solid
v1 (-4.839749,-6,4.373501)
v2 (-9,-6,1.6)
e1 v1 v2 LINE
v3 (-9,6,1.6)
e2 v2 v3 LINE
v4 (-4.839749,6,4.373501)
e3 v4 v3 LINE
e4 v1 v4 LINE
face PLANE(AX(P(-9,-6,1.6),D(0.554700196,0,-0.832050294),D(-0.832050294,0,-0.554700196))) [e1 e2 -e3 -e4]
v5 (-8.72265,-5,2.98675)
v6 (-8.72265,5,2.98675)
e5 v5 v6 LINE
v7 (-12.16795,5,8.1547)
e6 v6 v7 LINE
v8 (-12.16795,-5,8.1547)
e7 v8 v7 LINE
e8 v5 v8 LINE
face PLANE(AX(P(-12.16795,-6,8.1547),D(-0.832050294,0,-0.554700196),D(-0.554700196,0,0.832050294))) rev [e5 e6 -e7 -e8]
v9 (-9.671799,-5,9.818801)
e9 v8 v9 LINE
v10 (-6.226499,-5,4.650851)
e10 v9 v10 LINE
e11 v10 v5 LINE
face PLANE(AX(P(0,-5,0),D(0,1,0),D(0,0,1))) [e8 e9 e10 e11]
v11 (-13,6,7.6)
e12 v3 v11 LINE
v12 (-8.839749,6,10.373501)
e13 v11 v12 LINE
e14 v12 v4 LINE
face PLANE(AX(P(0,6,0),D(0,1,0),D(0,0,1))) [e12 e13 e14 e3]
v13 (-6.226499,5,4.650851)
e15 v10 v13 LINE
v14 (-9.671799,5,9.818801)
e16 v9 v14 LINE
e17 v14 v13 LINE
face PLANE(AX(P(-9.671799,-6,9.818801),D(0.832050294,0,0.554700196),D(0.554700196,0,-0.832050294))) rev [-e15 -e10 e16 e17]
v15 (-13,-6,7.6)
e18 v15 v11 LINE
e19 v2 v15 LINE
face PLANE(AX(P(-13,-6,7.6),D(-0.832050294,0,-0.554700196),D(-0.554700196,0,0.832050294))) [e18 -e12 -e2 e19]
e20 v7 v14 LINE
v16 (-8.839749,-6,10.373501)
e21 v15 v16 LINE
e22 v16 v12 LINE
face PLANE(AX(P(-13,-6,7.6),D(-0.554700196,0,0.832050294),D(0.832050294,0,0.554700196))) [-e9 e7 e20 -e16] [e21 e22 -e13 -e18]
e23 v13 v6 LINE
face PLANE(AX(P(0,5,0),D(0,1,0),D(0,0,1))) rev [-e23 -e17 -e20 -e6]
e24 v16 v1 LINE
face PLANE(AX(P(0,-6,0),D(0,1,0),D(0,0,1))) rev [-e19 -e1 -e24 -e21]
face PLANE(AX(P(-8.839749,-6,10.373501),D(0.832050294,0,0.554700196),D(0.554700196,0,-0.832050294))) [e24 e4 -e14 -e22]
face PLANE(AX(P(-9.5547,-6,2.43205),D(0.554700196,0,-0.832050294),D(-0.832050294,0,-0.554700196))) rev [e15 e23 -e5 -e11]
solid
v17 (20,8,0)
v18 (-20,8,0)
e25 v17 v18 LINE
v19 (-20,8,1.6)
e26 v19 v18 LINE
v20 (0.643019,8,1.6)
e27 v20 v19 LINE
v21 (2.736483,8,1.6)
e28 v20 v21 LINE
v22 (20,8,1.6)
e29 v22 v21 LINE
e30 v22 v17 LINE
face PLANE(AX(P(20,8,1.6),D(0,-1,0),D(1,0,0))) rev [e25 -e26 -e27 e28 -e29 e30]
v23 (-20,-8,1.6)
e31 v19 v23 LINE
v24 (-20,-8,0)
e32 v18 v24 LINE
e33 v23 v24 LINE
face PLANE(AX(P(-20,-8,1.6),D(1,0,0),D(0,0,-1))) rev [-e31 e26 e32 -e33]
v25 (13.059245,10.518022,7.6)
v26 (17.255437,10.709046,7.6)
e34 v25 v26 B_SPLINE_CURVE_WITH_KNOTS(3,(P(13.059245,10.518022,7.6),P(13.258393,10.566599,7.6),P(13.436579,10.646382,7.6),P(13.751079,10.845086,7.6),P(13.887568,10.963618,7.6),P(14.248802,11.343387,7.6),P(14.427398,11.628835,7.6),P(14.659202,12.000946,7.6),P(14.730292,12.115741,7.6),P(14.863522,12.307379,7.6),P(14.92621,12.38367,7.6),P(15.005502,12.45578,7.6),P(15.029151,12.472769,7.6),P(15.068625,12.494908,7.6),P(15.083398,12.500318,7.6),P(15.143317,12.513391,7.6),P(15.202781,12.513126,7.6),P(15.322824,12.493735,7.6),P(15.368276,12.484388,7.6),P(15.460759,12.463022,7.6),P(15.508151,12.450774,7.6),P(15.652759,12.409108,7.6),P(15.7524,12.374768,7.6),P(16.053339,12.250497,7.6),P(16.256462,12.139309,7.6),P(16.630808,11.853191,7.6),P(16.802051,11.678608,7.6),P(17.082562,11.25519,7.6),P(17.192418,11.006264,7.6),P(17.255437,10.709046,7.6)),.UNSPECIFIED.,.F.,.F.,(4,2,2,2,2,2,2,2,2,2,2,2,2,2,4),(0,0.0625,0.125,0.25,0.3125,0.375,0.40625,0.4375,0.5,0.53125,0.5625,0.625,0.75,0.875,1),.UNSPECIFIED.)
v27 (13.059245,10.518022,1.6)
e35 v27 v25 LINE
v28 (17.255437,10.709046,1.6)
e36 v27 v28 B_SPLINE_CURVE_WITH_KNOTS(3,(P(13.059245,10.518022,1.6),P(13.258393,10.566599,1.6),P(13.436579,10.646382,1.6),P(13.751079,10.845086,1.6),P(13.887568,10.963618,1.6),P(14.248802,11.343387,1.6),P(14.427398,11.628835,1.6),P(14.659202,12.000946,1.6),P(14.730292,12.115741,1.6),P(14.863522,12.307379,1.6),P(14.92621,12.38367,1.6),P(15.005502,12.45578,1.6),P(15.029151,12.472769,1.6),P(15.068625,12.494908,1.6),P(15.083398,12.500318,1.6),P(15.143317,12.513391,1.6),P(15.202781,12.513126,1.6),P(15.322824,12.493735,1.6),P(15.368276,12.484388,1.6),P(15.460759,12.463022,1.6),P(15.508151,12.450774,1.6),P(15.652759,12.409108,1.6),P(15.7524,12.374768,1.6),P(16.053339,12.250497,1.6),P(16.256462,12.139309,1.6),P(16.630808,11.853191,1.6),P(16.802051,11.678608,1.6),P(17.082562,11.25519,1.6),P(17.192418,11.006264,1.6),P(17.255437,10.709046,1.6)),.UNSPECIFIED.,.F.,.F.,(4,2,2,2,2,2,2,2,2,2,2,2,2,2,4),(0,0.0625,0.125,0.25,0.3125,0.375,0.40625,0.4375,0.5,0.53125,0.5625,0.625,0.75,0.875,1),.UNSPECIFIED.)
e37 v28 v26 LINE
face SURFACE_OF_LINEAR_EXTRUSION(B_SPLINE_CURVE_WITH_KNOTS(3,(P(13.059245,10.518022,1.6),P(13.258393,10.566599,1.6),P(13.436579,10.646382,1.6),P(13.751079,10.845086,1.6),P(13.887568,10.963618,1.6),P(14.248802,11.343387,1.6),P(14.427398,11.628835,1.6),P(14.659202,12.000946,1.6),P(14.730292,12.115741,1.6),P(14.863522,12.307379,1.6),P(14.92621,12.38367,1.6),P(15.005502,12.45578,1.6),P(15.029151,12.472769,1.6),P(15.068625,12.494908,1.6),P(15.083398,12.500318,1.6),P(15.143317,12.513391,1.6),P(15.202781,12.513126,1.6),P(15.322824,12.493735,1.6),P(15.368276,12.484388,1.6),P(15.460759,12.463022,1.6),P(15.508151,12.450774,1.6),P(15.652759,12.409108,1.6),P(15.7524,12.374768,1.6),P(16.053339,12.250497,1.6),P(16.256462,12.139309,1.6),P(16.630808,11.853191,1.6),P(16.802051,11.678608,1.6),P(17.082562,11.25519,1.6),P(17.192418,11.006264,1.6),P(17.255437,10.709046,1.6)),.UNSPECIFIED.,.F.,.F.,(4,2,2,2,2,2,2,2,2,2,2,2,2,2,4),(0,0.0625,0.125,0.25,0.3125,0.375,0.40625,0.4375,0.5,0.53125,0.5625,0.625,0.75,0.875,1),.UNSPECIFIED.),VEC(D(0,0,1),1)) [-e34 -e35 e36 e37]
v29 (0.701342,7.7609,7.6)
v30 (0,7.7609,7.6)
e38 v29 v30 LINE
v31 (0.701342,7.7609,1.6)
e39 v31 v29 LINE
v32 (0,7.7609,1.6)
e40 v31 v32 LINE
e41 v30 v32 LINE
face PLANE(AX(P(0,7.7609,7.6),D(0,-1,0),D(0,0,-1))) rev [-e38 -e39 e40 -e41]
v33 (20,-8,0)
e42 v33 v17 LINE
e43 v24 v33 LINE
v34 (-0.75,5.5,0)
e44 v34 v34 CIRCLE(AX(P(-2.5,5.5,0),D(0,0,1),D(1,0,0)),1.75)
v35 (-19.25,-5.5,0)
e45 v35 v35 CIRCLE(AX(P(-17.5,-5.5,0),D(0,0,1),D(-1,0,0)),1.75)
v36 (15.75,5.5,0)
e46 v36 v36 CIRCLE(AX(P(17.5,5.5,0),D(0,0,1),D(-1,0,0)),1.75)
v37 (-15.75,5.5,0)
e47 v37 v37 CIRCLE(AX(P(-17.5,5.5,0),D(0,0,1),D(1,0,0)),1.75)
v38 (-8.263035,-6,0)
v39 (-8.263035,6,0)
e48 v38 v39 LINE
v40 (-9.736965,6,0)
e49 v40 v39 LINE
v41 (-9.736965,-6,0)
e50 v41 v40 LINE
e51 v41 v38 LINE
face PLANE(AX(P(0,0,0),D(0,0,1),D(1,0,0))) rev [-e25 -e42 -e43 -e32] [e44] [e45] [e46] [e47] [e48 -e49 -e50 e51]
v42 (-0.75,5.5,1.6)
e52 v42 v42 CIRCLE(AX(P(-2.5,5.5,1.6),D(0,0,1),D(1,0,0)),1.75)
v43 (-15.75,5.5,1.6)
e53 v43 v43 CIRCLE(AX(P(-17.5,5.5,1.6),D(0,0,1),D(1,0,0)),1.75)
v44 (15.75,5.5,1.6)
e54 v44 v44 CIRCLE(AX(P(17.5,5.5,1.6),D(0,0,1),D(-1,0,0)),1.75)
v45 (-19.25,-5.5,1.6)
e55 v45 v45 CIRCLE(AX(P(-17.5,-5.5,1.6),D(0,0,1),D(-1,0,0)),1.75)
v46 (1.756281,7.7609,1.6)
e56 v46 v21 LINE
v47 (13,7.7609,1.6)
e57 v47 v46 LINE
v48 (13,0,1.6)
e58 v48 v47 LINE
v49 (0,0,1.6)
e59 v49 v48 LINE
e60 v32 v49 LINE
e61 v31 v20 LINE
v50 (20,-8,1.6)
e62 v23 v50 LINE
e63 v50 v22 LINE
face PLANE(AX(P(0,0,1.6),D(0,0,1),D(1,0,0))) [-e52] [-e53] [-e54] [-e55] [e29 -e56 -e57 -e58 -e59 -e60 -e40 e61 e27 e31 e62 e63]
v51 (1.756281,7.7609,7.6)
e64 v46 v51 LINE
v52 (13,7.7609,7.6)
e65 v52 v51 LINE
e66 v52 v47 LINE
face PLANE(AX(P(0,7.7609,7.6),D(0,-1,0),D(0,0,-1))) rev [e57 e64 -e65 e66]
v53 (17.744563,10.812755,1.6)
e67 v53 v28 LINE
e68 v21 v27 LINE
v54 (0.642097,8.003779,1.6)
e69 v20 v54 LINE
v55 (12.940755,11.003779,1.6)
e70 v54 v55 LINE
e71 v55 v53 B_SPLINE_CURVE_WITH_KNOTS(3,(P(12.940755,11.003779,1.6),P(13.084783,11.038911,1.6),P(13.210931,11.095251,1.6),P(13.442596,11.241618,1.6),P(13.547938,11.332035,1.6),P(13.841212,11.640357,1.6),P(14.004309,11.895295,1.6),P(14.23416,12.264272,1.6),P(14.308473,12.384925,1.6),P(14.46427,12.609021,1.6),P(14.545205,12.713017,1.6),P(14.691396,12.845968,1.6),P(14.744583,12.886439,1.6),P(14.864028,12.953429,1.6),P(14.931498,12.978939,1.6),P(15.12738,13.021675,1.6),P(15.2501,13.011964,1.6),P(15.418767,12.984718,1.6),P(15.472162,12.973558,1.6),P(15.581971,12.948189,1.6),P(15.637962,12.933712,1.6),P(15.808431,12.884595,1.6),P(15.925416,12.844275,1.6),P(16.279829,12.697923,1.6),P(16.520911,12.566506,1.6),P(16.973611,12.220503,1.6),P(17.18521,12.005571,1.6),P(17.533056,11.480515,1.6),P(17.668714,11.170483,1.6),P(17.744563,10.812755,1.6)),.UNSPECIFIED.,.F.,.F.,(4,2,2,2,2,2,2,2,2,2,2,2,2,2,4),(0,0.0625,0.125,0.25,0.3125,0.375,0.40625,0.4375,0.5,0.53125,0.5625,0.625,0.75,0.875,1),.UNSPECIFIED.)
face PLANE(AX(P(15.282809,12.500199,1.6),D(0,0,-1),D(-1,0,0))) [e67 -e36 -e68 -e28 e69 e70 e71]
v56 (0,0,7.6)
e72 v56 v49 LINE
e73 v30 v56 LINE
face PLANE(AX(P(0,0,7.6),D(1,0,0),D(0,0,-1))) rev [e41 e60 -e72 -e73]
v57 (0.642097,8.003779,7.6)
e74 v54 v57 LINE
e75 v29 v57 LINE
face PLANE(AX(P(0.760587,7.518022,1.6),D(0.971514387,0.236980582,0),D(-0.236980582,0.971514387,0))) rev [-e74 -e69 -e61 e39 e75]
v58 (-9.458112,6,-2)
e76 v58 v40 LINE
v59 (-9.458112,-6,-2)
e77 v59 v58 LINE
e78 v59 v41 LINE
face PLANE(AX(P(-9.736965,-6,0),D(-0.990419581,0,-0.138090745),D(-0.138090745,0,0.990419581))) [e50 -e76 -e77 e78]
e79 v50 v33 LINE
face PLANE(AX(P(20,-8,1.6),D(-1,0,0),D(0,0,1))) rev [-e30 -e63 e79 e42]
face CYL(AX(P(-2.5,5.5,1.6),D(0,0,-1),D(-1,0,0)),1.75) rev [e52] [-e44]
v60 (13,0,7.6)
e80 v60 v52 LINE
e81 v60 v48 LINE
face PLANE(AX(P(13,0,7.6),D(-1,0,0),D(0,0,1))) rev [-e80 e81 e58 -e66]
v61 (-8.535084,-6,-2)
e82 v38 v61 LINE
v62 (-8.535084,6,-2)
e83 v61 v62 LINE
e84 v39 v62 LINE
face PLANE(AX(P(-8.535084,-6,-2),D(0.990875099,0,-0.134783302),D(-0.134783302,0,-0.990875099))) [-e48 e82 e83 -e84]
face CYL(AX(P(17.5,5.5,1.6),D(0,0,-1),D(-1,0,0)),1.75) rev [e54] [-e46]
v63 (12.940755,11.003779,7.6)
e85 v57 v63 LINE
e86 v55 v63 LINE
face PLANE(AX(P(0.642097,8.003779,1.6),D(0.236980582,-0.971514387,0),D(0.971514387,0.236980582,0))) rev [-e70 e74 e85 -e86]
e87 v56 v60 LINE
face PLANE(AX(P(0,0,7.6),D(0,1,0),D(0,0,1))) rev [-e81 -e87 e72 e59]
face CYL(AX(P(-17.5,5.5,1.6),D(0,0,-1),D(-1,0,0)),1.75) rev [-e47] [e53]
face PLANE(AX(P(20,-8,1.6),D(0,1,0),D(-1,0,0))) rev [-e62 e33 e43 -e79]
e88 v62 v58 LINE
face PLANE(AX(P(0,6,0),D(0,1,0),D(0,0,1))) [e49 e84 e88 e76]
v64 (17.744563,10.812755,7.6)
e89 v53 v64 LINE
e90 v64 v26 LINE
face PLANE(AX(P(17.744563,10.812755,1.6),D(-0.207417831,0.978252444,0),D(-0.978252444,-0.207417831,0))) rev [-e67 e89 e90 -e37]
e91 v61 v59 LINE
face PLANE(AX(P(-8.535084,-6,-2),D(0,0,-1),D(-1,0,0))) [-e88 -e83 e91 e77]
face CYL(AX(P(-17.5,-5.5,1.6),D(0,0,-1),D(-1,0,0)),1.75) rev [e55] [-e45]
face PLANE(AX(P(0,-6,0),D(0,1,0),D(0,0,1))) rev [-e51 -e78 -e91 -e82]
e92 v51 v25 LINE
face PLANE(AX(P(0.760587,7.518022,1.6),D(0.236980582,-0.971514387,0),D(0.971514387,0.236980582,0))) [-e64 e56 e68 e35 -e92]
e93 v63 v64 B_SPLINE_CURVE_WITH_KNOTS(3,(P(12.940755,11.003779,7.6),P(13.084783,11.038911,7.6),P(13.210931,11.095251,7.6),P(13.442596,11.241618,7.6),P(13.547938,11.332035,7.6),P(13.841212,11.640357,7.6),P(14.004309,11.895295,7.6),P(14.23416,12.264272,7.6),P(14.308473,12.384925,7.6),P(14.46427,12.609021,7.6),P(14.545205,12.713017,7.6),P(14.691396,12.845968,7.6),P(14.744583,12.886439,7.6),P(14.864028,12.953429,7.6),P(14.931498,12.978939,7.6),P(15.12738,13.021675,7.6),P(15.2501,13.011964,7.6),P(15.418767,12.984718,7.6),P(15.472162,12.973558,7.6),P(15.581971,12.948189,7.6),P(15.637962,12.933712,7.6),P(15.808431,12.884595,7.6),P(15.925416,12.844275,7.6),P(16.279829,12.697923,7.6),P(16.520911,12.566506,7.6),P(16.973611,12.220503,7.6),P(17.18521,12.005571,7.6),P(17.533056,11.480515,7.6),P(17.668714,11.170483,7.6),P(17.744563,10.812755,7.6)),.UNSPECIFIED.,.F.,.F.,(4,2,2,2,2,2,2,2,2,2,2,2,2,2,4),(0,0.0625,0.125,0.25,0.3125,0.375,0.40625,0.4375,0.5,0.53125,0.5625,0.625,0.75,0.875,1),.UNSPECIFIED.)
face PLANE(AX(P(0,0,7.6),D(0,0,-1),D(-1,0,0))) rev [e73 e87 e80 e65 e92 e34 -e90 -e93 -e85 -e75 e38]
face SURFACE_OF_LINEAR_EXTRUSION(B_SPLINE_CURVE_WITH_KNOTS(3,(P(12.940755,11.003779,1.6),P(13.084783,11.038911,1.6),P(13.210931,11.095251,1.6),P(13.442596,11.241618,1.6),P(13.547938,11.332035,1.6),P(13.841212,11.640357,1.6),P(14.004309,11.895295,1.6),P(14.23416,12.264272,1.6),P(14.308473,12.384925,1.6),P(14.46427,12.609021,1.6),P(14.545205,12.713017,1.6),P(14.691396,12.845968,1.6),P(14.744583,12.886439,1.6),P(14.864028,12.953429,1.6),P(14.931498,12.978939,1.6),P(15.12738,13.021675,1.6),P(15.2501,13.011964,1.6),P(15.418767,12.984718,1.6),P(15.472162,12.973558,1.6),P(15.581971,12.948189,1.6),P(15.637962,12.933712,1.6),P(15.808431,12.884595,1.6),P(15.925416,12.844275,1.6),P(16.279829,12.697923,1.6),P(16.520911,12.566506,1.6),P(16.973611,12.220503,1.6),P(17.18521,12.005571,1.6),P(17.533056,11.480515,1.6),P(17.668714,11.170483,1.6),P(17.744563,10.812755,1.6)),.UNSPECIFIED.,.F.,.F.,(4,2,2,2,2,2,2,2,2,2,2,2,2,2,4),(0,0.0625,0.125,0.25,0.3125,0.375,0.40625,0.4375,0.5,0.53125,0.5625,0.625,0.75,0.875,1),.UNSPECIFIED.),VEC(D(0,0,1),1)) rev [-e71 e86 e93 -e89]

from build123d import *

# Parameters (mm, degrees)
SKETCH1_W           = 40
SKETCH1_H           = 16
SKETCH1_R           = 1.75
EXTRUDE1_DEPTH      = 1.6
SKETCH2_W           = 13
SKETCH2_H           = 7.760900167
EXTRUDE2_DEPTH      = 6
EXTRUDE_THIN1_START = -6
EXTRUDE_THIN1_DEPTH = 6
EXTRUDE3_DEPTH      = 6
EXTRUDE3_DEPTH_BACK = 6
SHELL1_T            = -1
EXTRUDE4_DEPTH      = 6
EXTRUDE4_DEPTH_BACK = 6


# Read off the part's stored shape, not the designer's step: Extrude-Thin1
with BuildPart() as part:
    # Sketch1 → Extrude1 (new body)
    with BuildSketch(Plane.XY):
        Rectangle(SKETCH1_W, SKETCH1_H)
        with Locations((-17.5, 5.5)):
            Circle(SKETCH1_R, mode=Mode.SUBTRACT)
        with Locations(Location((17.5, 5.5, 0), (0, 0, 180))):
            Circle(SKETCH1_R, mode=Mode.SUBTRACT)
        with Locations(Location((-17.5, -5.5, 0), (0, 0, 180))):
            Circle(SKETCH1_R, mode=Mode.SUBTRACT)
        with Locations((-2.5, 5.5)):
            Circle(SKETCH1_R, mode=Mode.SUBTRACT)
    extrude(amount=EXTRUDE1_DEPTH)

    # Sketch2 → Extrude2 (add)
    with BuildSketch(Plane.XY.offset(1.6)):
        with Locations((6.5, 3.880450084)):
            Rectangle(SKETCH2_W, SKETCH2_H)
    extrude(amount=EXTRUDE2_DEPTH)

    # Extrude-Thin1 outline → Extrude-Thin1 (add)
    with BuildSketch(Plane.XY.offset(7.6).offset(EXTRUDE_THIN1_START)):
        with BuildLine():
            Line((1.75628065, 7.760900167), (13.059245146, 10.51802157))
            add(Edge.make_bspline(
                [(13.059245146, 10.51802157), (13.258392783, 10.566599464), (13.436578776, 10.646382088), (13.751079076, 10.845085733), (13.887567817, 10.963617525), (14.248802057, 11.343386603), (14.427398427, 11.628835129), (14.659201777, 12.00094611), (14.730292096, 12.115741352), (14.863522365, 12.307378975), (14.926209875, 12.383669897), (15.005501687, 12.455780424), (15.029150989, 12.472768865), (15.068625166, 12.494907839), (15.08339758, 12.500317873), (15.14331693, 12.513390547), (15.202781043, 12.513126448), (15.322823552, 12.493735016), (15.368276479, 12.484388221), (15.460759179, 12.463022362), (15.50815066, 12.450773554), (15.652759011, 12.409108117), (15.752400152, 12.374767578), (16.053339356, 12.250496873), (16.25646151, 12.139308703), (16.630808407, 11.853191446), (16.802050862, 11.678608174), (17.082562235, 11.255189844), (17.192418017, 11.006263961), (17.255436889, 10.709045709)],
                knots=[0, 0, 0, 0, 0.0625, 0.0625, 0.125, 0.125, 0.25, 0.25, 0.3125, 0.3125, 0.375, 0.375, 0.40625, 0.40625, 0.4375, 0.4375, 0.5, 0.5, 0.53125, 0.53125, 0.5625, 0.5625, 0.625, 0.625, 0.75, 0.75, 0.875, 0.875, 1, 1, 1, 1], degree=3))
            Line((17.255436889, 10.709045709), (17.744563111, 10.812754625))
            add(Edge.make_bspline(
                [(12.940754854, 11.003778764), (13.084783094, 11.038911435), (13.210931122, 11.095251055), (13.442595629, 11.241618426), (13.547937674, 11.332035405), (13.841211649, 11.640357194), (14.004308568, 11.895295314), (14.234159709, 12.264272438), (14.308473314, 12.384924588), (14.464269553, 12.609020967), (14.545204627, 12.713016654), (14.691396043, 12.845967835), (14.74458271, 12.886438595), (14.86402781, 12.953429018), (14.931498353, 12.978939177), (15.127379677, 13.021674833), (15.250100345, 13.011964204), (15.418766988, 12.984718125), (15.472161624, 12.973557856), (15.58197057, 12.948189193), (15.637961747, 12.933712021), (15.808431424, 12.884595261), (15.925415704, 12.844275322), (16.279829349, 12.697922726), (16.520911208, 12.566506205), (16.973610567, 12.22050334), (17.185210355, 12.005571181), (17.533055699, 11.480515482), (17.668714391, 11.170482767), (17.744563111, 10.812754625)],
                knots=[0, 0, 0, 0, 0.0625, 0.0625, 0.125, 0.125, 0.25, 0.25, 0.3125, 0.3125, 0.375, 0.375, 0.40625, 0.40625, 0.4375, 0.4375, 0.5, 0.5, 0.53125, 0.53125, 0.5625, 0.5625, 0.625, 0.625, 0.75, 0.75, 0.875, 0.875, 1, 1, 1, 1], degree=3))
            Line((12.940754854, 11.003778764), (0.642096752, 8.003778764))
            Line((0.642096752, 8.003778764), (0.701341897, 7.760900167))
            Line((0.701341897, 7.760900167), (1.75628065, 7.760900167))
        make_face()
    extrude(amount=EXTRUDE_THIN1_DEPTH)

    # Sketch5 → Extrude4 (add, two sides: drawn at the far end of the back side and taken through both)
    with BuildSketch(Plane(origin=(0, 0, 0), x_dir=(1, 0, 0), z_dir=(0, 1, 0)).offset(-EXTRUDE4_DEPTH_BACK)):
        Polygon((-9.736964899, 0), (-9.458111879, 2), (-8.535084126, 2), (-8.263035101, 0), align=None)
    extrude(amount=EXTRUDE4_DEPTH + EXTRUDE4_DEPTH_BACK)


with BuildPart() as body_2:
    # Sketch4 → Extrude3 (new, two sides: drawn at the far end of the back side and taken through both)
    with BuildSketch(Plane(origin=(0, 0, 0), x_dir=(1, 0, 0), z_dir=(0, 1, 0)).offset(-EXTRUDE3_DEPTH_BACK)):
        Polygon((-13, -7.6), (-9, -1.6), (-4.839748528, -4.373500981), (-8.839748528, -10.373500981), align=None)
    extrude(amount=EXTRUDE3_DEPTH + EXTRUDE3_DEPTH_BACK)

    # Shell1
    shell1_openings = [body_2.faces().sort_by_distance(p)[0] for p in [
        (-10.919874264, 0, 8.986750491),
    ]]
    offset(amount=SHELL1_T, openings=shell1_openings, kind=Kind.INTERSECTION)


solid = Compound([part.part, body_2.part])
